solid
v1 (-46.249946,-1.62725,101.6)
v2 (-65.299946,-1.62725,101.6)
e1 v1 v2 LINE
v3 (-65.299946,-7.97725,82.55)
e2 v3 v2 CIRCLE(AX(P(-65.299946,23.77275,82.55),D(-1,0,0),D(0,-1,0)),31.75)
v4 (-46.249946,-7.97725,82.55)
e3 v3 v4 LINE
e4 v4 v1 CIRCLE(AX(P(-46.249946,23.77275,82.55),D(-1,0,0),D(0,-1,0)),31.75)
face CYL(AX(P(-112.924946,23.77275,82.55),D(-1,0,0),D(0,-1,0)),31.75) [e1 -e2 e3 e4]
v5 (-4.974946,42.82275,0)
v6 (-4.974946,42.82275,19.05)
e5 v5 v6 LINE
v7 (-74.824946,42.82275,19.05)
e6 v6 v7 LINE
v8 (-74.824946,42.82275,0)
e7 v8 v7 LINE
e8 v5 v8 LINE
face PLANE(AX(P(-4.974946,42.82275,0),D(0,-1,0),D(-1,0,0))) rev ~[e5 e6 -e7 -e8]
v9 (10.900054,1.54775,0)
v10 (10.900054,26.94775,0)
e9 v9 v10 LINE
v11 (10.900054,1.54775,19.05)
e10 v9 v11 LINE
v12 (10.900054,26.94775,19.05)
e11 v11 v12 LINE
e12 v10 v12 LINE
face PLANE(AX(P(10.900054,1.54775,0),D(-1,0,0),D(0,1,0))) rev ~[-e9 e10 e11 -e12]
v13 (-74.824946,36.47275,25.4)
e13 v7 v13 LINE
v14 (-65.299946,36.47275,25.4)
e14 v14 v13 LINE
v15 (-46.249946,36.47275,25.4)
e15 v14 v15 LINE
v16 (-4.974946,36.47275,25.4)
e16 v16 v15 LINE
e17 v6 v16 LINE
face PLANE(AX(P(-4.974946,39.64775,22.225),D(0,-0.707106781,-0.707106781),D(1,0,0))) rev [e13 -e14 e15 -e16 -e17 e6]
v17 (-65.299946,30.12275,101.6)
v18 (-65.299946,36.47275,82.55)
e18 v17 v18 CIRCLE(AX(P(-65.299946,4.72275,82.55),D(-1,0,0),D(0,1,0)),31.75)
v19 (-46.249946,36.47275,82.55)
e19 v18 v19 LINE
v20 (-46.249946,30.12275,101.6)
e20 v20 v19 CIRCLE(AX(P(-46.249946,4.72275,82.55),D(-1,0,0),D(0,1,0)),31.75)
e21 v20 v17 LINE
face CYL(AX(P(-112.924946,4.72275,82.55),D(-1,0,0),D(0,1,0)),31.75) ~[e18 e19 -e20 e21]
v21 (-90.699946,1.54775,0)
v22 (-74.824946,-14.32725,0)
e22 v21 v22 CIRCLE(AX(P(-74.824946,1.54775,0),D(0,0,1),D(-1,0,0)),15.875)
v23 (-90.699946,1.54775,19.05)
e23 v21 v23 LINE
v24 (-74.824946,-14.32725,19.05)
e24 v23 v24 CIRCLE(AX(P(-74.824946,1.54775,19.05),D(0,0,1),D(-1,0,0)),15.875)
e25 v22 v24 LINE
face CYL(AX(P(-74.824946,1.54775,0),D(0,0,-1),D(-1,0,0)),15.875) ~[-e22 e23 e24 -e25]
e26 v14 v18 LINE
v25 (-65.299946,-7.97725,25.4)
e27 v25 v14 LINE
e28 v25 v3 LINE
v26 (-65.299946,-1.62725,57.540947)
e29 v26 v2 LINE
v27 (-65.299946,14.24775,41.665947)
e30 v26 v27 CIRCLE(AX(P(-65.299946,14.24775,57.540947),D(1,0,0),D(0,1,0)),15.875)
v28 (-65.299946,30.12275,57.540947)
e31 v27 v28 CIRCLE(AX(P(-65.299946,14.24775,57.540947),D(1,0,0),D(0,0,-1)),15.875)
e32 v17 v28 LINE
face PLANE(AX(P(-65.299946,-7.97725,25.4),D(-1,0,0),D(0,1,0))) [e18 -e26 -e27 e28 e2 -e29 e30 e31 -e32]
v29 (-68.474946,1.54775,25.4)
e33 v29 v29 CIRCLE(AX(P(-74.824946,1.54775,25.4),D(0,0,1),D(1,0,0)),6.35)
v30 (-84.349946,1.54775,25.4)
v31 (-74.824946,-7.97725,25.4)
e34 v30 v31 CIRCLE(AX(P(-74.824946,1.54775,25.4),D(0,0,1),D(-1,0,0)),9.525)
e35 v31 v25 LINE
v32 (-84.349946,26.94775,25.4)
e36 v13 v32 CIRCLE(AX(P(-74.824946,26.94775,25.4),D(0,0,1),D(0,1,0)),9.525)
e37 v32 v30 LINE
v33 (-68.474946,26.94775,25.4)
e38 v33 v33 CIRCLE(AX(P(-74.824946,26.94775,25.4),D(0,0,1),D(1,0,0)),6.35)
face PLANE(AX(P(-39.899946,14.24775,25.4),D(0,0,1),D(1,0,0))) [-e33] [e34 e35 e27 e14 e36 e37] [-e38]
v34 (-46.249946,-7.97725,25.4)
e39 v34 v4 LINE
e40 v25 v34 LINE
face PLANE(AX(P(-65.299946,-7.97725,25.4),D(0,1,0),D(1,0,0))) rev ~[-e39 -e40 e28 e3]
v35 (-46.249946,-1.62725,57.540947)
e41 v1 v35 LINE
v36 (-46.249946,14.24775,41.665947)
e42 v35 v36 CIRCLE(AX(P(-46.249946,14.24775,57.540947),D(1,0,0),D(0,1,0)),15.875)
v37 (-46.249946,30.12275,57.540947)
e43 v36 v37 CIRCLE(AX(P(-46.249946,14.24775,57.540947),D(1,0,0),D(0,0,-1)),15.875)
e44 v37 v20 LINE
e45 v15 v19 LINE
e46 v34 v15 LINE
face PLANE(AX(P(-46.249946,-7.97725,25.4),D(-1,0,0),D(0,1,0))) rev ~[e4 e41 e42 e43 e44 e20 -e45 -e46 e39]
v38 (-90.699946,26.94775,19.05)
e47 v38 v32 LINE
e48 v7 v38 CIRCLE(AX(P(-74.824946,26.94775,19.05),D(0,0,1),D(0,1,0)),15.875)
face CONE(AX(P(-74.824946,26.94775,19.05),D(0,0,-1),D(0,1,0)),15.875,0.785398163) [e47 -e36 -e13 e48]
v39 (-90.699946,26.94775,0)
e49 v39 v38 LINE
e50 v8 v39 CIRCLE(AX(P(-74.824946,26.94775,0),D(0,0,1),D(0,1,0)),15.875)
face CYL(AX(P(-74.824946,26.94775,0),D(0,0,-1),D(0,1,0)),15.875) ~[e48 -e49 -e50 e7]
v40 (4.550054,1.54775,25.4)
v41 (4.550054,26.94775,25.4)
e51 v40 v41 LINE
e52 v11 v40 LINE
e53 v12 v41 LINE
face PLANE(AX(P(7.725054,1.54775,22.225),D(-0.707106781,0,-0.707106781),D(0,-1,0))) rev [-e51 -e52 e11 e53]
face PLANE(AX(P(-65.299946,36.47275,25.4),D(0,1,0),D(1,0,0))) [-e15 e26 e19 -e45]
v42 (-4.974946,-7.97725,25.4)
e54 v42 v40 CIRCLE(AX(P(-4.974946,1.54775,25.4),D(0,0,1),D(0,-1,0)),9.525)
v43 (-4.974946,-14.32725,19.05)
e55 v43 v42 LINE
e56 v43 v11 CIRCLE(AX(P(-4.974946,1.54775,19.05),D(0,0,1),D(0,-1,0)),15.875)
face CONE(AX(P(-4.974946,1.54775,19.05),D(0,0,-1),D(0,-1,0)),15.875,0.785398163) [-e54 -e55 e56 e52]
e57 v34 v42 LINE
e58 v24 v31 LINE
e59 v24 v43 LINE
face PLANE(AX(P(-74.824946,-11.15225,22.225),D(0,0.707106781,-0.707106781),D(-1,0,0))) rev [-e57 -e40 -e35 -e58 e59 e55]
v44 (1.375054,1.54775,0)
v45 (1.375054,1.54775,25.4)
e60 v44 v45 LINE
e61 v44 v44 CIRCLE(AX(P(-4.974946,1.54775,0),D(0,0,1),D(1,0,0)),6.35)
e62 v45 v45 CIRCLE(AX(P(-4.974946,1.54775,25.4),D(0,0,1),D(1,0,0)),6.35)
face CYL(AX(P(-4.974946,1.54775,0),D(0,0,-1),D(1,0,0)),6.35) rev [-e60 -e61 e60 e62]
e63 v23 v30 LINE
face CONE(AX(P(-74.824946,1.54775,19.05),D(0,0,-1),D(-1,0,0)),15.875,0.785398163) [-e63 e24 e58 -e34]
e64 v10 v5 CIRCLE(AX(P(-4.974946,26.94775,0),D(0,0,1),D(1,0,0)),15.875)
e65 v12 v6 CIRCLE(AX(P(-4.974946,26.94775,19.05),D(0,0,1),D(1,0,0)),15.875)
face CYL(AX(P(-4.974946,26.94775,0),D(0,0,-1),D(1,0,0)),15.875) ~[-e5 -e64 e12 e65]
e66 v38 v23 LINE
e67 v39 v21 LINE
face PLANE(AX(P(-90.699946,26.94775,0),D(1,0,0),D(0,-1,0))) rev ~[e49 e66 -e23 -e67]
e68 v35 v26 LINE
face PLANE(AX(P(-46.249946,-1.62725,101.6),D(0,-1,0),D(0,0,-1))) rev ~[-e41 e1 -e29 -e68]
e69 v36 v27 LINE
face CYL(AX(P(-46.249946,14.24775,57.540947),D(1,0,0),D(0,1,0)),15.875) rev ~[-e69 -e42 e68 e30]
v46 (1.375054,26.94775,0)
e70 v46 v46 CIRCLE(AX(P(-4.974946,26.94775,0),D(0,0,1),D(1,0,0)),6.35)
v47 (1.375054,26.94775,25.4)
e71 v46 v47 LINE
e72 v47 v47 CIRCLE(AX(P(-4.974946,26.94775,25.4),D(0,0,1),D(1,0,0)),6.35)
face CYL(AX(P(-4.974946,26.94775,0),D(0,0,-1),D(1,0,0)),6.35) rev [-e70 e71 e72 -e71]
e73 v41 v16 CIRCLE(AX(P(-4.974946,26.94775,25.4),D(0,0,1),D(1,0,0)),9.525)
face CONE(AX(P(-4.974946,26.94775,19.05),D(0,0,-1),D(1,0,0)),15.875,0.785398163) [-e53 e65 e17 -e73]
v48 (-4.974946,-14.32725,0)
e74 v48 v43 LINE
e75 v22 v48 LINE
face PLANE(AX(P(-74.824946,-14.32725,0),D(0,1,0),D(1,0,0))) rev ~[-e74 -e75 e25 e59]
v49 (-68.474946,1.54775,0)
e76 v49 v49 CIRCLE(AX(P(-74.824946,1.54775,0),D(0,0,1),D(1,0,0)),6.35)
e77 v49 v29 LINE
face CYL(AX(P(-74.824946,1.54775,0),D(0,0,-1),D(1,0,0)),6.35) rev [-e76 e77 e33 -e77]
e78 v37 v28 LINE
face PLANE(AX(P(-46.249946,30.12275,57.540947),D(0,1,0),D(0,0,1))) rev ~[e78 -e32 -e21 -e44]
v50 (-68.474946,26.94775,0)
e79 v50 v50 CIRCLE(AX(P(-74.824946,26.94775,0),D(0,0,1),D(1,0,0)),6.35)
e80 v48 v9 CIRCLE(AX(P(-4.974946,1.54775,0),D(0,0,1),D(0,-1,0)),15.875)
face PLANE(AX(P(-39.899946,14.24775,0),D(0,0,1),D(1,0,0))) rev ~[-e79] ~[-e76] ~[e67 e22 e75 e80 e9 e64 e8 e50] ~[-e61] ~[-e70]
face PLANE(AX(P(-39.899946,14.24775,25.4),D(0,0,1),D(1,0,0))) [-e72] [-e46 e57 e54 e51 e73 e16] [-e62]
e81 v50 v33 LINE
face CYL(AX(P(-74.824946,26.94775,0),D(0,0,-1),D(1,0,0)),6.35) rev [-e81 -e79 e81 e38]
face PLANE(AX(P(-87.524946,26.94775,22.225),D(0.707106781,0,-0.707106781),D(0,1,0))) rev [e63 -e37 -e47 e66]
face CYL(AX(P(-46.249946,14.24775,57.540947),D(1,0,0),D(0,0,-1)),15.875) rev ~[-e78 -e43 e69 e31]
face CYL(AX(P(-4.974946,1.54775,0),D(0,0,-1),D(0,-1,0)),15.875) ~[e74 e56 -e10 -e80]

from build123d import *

# Parameters (mm, degrees)
F0_R        = 6.35
F1_DEPTH    = 25.4
F2_SIZE     = 6.35
F3_W        = 19.05
F3_H        = 44.45
F4_DEPTH    = 76.2
F6_DEPTH    = 19.05
F8_DEPTH    = 25.4
F9_T1_DEPTH = 114.3


# Not quite as in the source:
# - a fillet or chamfer that OpenCascade refuses, or shapes differently, is made with other operations: its cross-section is extruded or revolved along the edge and cut away or added


with BuildPart() as f1:
    # F0 (on Top) → F1 (new body)
    with BuildSketch(Plane.XY):
        with BuildLine():
            Line((-4.9749455661, 42.822749579), (-74.8249455661, 42.822749579))
            ThreePointArc((-74.8249455661, 42.822749579), (-86.0502657174, 38.1730697303), (-90.6999455661, 26.947749579))
            Line((-90.6999455661, 26.947749579), (-90.6999455661, 1.547749579))
            ThreePointArc((-90.6999455661, 1.547749579), (-86.0502657174, -9.6775705724), (-74.8249455661, -14.327250421))
            Line((-74.8249455661, -14.327250421), (-4.9749455661, -14.327250421))
            ThreePointArc((-4.9749455661, -14.327250421), (6.2503745853, -9.6775705724), (10.9000544339, 1.547749579))
            Line((10.9000544339, 1.547749579), (10.9000544339, 26.947749579))
            ThreePointArc((10.9000544339, 26.947749579), (6.2503745853, 38.1730697303), (-4.9749455661, 42.822749579))
        make_face()
        with Locations((-74.8249455661, 1.547749579)):
            Circle(F0_R, mode=Mode.SUBTRACT)
        with Locations((-4.9749455661, 1.547749579)):
            Circle(F0_R, mode=Mode.SUBTRACT)
        with Locations((-74.8249455661, 26.947749579)):
            Circle(F0_R, mode=Mode.SUBTRACT)
        with Locations((-4.9749455661, 26.947749579)):
            Circle(F0_R, mode=Mode.SUBTRACT)
    extrude(amount=F1_DEPTH)

    # F2
    f2_edges = [f1.edges().sort_by_distance(p)[0] for p in [
        (6.250375, -9.677571, 25.4),
        (10.900054, 14.24775, 25.4),
        (6.250375, 38.17307, 25.4),
        (-39.899946, 42.82275, 25.4),
        (-86.050266, 38.17307, 25.4),
        (-90.699946, 14.24775, 25.4),
        (-86.050266, -9.677571, 25.4),
        (-39.899946, -14.32725, 25.4),
    ]]
    chamfer(f2_edges, length=F2_SIZE)

    # F3 (on face) → F4 (join)
    with BuildSketch(Plane.XY.offset(25.4)):
        with Locations((-55.7749455661, 14.247749579)):
            Rectangle(F3_W, F3_H)
    extrude(amount=F4_DEPTH)

    # F5 (on face) → F6 (cut, through all)
    with BuildSketch(Plane.YZ.offset(-46.2499455661)):
        with BuildLine():
            ThreePointArc((14.247749579, 41.6659471005), (25.4730697303, 46.3156269492), (30.122749579, 57.5409471005))
            ThreePointArc((30.122749579, 57.5409471005), (3.0224294276, 68.7662672519), (14.247749579, 41.6659471005))
        make_face()
    extrude(amount=-F6_DEPTH, mode=Mode.SUBTRACT)

    # F7 (on face) → F8 (cut)
    with BuildSketch(Plane.YZ.offset(-46.2499455661)):
        with BuildLine():
            ThreePointArc((-1.627250421, 57.5409471005), (14.247749579, 73.4159471005), (30.122749579, 57.5409471005))
            Line((30.122749579, 57.5409471005), (30.122749579, 101.6))
            Line((30.122749579, 101.6), (-1.627250421, 101.6))
            Line((-1.627250421, 101.6), (-1.627250421, 57.5409471005))
        make_face()
    extrude(amount=-F8_DEPTH, mode=Mode.SUBTRACT)

    # F9: fillet of radius 31.75 on 2 edges, made by hand

    # F9_s2 → F9_t1 (cut)
    with BuildSketch(Plane.YZ.offset(-112.9249455661)):
        with BuildLine():
            ThreePointArc((-7.977250421, 82.55), (-6.3479451342, 92.590231571), (-1.627250421, 101.6))
            Line((-1.627250421, 101.6), (-7.977250421, 101.6))
            Line((-7.977250421, 101.6), (-7.977250421, 82.55))
        make_face()
        with BuildLine():
            ThreePointArc((36.472749579, 82.55), (34.8434442921, 92.590231571), (30.122749579, 101.6))
            Line((30.122749579, 101.6), (36.472749579, 101.6))
            Line((36.472749579, 101.6), (36.472749579, 82.55))
        make_face()
    extrude(amount=F9_T1_DEPTH, mode=Mode.SUBTRACT)


solid = f1.part
